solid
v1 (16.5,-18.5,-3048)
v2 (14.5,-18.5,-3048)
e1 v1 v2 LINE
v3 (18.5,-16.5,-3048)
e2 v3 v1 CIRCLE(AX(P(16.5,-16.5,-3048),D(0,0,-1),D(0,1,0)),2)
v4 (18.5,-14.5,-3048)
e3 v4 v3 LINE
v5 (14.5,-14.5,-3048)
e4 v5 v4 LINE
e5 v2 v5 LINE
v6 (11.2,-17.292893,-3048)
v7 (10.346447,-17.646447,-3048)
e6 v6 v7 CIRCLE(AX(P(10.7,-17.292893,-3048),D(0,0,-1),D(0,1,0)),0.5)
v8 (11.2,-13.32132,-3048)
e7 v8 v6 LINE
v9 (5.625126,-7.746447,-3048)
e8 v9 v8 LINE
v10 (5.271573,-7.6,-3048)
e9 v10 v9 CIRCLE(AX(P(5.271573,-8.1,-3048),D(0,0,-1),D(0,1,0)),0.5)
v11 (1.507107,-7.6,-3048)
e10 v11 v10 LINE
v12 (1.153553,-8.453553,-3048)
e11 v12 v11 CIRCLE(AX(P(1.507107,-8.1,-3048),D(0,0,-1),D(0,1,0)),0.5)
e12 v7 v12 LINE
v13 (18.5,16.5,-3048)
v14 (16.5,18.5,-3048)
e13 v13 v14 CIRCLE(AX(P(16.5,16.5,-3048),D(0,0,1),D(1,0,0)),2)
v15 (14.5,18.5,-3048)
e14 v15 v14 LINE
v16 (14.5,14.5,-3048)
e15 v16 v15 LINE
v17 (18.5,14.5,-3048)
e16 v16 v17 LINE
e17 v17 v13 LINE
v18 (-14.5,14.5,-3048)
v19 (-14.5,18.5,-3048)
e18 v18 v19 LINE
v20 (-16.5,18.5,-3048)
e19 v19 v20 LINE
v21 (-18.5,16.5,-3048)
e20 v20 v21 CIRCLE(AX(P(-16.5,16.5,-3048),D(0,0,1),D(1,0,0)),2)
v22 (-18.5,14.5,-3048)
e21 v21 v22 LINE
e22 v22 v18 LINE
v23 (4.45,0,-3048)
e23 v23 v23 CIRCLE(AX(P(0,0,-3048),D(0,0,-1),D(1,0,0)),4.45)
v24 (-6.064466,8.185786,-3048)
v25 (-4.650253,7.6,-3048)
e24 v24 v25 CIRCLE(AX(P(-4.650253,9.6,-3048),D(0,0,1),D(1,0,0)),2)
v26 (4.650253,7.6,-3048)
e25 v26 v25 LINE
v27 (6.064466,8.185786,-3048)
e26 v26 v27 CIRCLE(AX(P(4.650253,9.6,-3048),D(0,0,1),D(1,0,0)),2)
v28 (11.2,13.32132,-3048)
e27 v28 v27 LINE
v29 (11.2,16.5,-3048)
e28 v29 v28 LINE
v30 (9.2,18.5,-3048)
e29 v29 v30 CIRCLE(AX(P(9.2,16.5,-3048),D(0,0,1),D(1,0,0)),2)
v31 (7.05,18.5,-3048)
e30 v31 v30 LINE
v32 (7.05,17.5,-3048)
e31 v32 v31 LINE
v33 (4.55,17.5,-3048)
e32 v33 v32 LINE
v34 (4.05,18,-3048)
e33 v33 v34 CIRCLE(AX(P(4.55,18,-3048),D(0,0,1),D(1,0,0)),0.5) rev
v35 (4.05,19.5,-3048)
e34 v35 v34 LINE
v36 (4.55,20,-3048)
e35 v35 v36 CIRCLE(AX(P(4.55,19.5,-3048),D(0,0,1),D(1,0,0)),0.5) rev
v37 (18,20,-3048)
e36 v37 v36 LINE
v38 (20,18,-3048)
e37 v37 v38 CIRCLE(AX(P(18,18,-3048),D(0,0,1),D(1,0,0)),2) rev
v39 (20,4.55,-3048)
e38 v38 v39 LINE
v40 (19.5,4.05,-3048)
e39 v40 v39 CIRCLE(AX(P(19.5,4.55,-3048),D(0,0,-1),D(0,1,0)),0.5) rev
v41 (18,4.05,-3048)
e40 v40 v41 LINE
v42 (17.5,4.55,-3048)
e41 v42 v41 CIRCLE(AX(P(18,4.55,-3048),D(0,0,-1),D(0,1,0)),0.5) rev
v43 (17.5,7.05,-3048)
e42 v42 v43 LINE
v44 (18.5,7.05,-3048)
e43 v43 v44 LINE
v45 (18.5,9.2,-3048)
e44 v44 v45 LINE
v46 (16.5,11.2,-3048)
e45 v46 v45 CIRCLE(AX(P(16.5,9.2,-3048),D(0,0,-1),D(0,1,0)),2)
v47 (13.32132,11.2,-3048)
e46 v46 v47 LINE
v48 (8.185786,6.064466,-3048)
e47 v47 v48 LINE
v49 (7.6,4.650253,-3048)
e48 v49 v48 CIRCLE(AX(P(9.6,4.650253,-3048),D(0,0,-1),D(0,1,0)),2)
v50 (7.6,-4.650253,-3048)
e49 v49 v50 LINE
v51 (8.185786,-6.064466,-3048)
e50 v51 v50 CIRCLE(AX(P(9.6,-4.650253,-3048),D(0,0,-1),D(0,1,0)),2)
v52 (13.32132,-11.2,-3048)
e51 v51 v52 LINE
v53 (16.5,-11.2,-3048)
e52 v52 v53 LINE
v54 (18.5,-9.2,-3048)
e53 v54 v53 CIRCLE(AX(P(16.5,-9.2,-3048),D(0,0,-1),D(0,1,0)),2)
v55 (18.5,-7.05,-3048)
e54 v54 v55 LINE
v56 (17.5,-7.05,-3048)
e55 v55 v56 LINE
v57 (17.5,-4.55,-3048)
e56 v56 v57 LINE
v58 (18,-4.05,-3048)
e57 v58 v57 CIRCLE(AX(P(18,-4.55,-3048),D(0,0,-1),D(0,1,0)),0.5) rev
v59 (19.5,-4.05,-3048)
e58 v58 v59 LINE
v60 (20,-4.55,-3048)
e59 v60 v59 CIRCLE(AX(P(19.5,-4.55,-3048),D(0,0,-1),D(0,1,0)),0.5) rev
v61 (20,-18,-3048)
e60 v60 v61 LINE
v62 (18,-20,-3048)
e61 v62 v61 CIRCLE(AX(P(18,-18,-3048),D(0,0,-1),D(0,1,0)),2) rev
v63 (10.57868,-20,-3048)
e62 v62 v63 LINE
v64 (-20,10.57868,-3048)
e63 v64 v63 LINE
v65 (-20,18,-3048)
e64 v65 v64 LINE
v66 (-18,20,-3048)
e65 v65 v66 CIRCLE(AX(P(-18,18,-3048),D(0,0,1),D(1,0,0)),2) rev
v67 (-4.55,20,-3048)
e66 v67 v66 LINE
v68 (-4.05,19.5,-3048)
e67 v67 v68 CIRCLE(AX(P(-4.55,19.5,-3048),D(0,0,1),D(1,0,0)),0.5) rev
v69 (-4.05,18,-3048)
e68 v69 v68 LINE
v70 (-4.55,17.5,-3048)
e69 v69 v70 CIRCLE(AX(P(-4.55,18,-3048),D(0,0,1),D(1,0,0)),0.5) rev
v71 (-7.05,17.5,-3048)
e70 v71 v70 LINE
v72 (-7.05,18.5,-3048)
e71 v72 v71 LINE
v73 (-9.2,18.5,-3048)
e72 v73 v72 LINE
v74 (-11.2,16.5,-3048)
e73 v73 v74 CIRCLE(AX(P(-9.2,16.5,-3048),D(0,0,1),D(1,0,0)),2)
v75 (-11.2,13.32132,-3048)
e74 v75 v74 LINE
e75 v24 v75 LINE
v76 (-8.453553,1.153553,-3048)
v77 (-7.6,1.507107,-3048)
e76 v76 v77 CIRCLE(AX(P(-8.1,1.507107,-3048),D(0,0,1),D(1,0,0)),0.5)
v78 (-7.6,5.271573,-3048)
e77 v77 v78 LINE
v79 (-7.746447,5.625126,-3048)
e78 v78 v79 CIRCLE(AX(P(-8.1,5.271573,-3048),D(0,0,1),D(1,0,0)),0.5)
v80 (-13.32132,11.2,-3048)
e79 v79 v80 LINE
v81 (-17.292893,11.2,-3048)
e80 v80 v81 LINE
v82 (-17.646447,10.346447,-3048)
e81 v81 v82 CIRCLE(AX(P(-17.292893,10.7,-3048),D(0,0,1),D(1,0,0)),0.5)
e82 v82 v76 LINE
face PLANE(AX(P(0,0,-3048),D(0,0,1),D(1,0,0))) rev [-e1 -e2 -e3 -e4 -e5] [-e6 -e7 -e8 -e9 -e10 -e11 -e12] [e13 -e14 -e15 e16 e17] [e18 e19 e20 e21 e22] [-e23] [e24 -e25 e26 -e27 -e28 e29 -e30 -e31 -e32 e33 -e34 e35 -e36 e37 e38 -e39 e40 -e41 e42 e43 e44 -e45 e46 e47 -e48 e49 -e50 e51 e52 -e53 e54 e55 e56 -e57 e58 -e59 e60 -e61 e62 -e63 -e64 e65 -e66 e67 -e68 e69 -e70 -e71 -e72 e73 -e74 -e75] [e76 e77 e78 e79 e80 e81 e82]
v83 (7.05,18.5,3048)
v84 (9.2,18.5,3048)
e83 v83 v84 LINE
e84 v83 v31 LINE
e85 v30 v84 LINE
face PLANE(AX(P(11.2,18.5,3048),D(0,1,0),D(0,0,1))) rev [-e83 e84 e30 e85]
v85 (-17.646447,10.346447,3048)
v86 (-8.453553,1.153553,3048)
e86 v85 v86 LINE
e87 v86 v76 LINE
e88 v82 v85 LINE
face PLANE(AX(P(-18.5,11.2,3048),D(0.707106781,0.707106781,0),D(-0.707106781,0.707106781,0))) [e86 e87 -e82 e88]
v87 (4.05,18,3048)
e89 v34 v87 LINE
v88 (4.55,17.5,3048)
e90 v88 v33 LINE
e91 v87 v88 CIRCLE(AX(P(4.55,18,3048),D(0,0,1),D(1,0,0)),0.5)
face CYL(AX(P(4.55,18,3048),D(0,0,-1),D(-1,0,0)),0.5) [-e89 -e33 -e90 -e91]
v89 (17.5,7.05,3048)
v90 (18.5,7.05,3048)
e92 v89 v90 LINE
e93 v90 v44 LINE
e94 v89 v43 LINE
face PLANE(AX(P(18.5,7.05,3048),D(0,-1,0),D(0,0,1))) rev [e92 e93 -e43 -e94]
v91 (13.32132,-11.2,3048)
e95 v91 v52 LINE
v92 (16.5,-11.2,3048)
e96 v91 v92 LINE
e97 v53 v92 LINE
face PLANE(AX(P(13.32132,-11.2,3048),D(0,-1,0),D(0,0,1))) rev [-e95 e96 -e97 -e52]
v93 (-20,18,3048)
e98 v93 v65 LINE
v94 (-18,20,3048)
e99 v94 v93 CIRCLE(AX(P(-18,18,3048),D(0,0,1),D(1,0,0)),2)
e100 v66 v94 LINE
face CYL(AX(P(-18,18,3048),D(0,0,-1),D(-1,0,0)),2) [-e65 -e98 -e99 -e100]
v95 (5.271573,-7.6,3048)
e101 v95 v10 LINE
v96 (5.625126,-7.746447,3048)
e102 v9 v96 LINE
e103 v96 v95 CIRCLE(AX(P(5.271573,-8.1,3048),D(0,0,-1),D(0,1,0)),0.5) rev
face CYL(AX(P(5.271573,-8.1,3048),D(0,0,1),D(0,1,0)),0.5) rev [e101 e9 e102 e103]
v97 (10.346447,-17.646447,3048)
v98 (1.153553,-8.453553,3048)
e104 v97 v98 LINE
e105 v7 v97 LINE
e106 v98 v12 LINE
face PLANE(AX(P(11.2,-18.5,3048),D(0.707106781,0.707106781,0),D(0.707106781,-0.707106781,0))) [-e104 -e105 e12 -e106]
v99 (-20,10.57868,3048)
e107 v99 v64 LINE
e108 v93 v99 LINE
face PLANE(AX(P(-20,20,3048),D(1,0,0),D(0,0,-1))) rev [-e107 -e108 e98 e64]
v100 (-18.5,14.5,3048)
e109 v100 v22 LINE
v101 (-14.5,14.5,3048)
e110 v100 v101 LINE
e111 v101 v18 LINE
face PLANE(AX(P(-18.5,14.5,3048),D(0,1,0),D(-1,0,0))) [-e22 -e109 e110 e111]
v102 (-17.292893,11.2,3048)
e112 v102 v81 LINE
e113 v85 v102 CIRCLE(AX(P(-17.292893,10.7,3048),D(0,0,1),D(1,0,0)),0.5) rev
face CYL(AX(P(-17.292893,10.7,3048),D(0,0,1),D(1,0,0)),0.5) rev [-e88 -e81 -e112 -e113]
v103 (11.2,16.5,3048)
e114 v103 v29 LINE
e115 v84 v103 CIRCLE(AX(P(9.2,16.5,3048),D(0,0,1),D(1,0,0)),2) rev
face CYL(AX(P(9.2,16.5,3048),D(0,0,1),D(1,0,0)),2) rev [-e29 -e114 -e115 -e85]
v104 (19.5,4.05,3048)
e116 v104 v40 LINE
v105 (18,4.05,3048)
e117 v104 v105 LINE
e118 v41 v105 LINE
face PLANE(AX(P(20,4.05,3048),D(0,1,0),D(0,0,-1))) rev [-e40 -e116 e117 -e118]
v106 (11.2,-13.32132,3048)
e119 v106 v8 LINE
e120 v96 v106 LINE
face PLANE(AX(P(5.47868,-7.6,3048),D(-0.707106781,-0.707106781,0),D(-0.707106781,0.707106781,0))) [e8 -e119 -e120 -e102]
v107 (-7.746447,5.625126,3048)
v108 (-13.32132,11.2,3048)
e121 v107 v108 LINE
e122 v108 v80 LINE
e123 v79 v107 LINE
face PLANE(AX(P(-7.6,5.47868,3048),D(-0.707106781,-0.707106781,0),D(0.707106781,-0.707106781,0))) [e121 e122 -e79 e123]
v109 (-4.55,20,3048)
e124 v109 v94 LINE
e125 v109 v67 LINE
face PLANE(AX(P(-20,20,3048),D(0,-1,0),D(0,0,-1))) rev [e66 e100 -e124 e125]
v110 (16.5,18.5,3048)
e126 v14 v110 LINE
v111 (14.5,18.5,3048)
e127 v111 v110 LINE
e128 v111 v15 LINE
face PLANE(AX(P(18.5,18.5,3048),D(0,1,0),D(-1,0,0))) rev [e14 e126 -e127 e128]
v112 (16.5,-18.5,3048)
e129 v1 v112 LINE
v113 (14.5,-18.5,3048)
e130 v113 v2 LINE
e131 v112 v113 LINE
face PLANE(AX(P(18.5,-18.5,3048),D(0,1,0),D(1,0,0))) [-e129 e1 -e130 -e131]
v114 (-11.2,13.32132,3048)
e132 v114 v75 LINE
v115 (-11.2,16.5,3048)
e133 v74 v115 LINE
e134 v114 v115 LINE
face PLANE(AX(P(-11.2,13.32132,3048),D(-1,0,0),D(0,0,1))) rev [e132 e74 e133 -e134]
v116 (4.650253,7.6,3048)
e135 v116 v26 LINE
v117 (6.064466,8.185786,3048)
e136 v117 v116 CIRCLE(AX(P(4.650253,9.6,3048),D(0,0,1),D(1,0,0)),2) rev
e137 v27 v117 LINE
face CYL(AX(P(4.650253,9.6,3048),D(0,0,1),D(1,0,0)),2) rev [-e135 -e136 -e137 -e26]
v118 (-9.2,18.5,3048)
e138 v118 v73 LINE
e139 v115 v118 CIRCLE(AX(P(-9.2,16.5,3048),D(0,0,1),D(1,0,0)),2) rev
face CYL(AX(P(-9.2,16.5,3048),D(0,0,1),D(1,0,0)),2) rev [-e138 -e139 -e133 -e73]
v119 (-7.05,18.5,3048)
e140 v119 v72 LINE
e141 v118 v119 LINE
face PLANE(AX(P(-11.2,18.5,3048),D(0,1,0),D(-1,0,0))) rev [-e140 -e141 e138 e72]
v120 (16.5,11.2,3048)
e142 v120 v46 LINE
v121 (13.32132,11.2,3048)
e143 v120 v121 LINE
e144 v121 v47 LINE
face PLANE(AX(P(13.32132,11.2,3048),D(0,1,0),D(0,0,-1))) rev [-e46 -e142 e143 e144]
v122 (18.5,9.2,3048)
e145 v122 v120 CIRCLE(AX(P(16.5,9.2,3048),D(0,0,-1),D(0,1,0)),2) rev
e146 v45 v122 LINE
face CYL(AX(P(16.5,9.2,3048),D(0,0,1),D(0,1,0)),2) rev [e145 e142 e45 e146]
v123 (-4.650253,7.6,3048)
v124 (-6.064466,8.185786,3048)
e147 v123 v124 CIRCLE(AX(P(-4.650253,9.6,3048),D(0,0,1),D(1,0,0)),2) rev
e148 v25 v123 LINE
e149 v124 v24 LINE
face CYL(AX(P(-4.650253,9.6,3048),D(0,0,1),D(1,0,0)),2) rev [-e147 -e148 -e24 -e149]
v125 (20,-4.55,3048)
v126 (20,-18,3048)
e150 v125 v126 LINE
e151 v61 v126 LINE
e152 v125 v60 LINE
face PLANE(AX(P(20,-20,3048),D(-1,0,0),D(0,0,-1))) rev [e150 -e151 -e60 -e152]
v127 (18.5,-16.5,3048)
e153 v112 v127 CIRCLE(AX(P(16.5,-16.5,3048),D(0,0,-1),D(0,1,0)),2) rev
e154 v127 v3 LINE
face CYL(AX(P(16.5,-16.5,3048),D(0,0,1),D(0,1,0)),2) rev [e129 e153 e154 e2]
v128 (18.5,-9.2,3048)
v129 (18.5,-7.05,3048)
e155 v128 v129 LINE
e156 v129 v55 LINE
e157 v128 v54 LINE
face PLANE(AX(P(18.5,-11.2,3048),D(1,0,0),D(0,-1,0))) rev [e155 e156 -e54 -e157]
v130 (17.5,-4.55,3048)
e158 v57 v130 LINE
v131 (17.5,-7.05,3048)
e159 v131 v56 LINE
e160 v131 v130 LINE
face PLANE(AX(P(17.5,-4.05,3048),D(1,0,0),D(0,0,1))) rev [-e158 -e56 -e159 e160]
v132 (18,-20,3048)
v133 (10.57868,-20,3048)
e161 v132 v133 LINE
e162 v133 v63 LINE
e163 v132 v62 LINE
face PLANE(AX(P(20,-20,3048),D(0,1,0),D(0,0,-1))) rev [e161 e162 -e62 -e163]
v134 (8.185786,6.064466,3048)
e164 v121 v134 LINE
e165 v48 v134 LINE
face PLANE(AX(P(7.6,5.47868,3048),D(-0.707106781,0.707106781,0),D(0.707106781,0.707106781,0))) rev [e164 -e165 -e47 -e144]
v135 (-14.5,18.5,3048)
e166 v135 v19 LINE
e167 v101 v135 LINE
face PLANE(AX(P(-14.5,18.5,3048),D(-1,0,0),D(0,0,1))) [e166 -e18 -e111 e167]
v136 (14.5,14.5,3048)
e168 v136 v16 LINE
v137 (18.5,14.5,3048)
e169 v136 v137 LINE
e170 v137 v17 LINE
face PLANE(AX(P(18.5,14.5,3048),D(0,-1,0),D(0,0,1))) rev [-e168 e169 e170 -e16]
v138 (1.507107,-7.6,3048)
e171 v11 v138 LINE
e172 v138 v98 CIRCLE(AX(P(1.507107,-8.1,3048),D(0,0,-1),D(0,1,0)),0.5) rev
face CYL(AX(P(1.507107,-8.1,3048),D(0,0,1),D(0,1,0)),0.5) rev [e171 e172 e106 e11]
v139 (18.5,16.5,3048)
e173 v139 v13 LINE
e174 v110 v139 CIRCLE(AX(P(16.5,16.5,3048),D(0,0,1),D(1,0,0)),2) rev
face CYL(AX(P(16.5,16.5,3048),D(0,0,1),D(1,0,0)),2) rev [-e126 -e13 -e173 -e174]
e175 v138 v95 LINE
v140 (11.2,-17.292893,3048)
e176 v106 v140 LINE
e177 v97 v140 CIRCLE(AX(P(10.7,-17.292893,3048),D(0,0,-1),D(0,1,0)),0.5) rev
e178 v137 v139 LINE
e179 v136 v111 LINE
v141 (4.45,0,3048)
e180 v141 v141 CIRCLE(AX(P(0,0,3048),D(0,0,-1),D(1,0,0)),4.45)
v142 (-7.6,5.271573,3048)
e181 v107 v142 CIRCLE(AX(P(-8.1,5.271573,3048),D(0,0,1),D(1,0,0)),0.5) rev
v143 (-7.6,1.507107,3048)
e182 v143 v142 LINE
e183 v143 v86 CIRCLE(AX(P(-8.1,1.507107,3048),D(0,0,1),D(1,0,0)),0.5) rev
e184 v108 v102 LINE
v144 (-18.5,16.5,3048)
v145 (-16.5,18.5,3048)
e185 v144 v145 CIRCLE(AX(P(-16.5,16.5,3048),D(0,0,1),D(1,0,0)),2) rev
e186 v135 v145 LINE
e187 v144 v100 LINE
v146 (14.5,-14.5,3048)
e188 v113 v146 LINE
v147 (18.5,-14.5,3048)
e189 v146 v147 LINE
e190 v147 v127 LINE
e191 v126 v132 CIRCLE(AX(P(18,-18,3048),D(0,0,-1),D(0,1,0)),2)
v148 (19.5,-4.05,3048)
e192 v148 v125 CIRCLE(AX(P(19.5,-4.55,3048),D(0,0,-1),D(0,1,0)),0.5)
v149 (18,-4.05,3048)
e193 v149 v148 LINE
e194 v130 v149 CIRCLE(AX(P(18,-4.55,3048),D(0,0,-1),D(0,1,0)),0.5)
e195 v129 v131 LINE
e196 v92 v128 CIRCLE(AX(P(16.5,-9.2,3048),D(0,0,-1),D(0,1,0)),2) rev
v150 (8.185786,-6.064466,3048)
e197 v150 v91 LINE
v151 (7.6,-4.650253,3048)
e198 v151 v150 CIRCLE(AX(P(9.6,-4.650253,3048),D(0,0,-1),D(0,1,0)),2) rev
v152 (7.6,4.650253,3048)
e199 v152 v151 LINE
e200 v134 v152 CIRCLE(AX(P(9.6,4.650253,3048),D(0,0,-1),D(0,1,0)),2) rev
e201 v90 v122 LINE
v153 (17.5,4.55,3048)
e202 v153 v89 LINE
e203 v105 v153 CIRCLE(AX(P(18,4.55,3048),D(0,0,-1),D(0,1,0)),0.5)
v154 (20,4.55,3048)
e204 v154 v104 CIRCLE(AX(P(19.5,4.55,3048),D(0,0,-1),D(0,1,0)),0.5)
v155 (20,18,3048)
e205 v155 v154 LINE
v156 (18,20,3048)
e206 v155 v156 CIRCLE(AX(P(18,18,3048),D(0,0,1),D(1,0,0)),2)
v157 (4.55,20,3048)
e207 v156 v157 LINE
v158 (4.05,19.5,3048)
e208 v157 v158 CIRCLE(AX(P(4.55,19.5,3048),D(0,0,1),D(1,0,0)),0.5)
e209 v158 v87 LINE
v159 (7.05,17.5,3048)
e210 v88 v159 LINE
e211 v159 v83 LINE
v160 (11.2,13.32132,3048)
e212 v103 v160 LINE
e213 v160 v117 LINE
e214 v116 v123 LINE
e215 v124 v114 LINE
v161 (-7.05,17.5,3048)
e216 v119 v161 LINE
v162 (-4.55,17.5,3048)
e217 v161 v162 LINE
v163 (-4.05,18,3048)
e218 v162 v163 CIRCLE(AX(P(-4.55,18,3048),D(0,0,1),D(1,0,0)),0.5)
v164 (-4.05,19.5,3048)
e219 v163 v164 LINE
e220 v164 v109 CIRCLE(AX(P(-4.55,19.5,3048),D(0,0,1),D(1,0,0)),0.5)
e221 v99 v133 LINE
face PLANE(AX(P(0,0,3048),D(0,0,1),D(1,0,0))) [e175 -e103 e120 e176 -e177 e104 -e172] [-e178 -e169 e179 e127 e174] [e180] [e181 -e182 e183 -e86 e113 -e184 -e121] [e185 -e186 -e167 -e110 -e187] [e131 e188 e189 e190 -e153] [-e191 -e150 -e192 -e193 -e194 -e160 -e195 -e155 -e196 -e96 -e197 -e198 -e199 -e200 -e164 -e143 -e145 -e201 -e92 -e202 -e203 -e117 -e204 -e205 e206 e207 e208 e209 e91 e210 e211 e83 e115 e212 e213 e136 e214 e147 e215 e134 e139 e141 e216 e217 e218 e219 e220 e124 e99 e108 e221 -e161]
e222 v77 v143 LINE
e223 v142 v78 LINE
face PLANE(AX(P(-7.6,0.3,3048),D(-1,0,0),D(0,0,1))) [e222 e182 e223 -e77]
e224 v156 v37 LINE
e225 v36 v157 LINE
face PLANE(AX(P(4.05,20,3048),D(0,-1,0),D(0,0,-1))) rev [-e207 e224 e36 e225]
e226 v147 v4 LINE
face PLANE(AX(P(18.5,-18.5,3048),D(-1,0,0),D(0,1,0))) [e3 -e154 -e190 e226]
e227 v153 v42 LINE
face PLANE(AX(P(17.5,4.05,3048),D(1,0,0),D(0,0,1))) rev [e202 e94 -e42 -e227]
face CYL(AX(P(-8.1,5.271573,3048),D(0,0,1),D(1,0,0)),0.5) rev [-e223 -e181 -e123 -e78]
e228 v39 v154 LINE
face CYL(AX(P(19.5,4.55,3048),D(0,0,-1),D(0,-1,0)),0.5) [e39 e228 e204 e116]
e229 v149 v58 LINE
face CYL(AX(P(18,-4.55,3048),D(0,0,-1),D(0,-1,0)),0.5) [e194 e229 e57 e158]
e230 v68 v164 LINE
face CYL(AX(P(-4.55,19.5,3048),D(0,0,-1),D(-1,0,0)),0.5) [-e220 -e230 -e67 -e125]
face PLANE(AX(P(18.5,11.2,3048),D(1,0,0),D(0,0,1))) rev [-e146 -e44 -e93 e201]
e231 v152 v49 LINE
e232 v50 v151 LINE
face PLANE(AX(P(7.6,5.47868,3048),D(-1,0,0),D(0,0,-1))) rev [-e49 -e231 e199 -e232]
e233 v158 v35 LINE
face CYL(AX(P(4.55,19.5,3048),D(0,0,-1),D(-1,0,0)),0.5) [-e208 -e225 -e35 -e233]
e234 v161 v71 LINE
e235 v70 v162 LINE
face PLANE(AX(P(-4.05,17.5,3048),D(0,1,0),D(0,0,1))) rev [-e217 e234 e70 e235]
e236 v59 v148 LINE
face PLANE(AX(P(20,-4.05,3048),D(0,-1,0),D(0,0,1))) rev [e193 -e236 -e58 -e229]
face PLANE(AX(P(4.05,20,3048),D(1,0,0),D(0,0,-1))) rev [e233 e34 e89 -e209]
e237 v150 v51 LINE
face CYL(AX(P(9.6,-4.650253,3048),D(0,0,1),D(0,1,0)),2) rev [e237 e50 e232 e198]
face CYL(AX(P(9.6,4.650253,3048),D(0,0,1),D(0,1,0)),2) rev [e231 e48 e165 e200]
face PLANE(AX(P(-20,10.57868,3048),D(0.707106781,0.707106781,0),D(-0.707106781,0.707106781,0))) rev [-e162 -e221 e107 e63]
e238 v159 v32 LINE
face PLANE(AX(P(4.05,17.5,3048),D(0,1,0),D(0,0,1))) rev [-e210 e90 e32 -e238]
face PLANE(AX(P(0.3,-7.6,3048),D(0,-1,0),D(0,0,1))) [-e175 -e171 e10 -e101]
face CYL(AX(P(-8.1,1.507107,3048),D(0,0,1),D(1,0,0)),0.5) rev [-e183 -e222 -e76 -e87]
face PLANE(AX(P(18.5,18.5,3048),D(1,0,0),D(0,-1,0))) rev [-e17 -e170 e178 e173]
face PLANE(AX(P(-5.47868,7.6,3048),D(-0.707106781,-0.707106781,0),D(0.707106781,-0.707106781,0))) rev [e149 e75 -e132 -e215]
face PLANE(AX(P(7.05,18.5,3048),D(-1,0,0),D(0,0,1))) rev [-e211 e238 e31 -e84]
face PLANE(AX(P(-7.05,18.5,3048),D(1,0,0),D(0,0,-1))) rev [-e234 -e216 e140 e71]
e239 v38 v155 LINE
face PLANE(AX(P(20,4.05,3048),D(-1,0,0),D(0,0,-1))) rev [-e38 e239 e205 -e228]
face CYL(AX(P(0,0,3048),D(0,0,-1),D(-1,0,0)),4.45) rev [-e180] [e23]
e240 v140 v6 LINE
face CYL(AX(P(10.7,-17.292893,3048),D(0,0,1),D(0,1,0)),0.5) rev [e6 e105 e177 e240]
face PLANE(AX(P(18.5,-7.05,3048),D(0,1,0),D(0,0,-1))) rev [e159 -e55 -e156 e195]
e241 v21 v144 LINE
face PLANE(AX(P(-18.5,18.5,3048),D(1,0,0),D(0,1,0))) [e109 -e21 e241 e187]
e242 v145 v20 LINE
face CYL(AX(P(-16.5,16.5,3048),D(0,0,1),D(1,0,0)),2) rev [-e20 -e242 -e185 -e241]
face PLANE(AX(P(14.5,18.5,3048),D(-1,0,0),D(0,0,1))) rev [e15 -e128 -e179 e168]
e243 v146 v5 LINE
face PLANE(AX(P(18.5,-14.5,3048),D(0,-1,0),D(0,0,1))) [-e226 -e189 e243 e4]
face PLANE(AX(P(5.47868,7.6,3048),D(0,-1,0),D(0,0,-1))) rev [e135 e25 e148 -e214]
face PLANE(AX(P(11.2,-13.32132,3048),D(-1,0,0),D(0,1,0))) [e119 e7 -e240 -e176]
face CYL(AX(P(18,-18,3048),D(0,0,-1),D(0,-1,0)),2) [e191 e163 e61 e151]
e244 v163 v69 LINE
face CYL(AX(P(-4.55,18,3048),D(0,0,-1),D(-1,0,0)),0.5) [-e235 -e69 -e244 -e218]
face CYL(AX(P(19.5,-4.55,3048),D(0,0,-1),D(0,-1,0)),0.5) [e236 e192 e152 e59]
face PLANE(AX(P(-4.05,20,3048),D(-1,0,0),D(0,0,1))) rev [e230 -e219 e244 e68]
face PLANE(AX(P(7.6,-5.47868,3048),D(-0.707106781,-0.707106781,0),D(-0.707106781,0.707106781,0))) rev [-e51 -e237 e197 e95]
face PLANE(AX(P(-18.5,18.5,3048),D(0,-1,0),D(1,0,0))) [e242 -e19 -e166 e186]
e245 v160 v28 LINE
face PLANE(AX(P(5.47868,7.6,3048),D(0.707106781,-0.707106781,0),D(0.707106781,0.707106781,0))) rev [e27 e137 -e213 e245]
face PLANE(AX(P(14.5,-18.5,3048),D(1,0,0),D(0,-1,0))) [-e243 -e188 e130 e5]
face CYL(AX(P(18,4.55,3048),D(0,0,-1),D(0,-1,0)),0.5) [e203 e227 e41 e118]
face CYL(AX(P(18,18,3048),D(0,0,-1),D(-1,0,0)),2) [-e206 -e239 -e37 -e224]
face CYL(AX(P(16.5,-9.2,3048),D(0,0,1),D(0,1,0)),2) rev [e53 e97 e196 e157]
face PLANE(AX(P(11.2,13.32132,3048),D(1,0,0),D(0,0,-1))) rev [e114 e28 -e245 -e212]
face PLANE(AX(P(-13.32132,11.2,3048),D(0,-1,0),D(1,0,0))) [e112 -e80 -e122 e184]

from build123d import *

# Parameters (mm, degrees)
SKETCH3_W           = 4
SKETCH3_H           = 4
BOSS_EXTRUDE1_DEPTH = 3048
FILLET1_R           = 2
FILLET3_R           = 0.5
FILLET2_START       = -3049
FILLET2_DEPTH       = 6098
FILLET2_START_2     = -3048
FILLET2_2_DEPTH     = 6096


with BuildPart() as part:
    # Sketch3 → Boss-Extrude1 (new, symmetric)
    with BuildSketch(Plane.XY):
        with BuildLine():
            Line((18.5, 18.5), (14.5, 18.5))
            Line((14.5, 18.5), (14.5, 14.5))
            Line((14.5, 14.5), (3.146625176, 3.146625176))
            ThreePointArc((3.146625176, 3.146625176), (-3.146625176, 3.146625176), (-3.146625176, -3.146625176))
            Line((-3.146625176, -3.146625176), (-4.710660172, -4.710660172))
            Line((-4.710660172, -4.710660172), (-20, 10.578679656))
            Line((-20, 10.578679656), (-20, 20))
            Line((-20, 20), (-4.05, 20))
            Line((-4.05, 20), (-4.05, 17.5))
            Line((-4.05, 17.5), (-7.05, 17.5))
            Line((-7.05, 17.5), (-7.05, 18.5))
            Line((-7.05, 18.5), (-11.2, 18.5))
            Line((-11.2, 18.5), (-11.2, 13.321320344))
            Line((-11.2, 13.321320344), (-5.478679656, 7.6))
            Line((-5.478679656, 7.6), (5.478679656, 7.6))
            Line((5.478679656, 7.6), (11.2, 13.321320344))
            Line((11.2, 13.321320344), (11.2, 18.5))
            Line((11.2, 18.5), (7.05, 18.5))
            Line((7.05, 18.5), (7.05, 17.5))
            Line((7.05, 17.5), (4.05, 17.5))
            Line((4.05, 17.5), (4.05, 20))
            Line((4.05, 20), (20, 20))
            Line((20, 20), (18.5, 18.5))
        make_face()
        Polygon((-13.321320344, 11.2), (-18.5, 11.2), (-7.6, 0.3), (-7.6, 5.478679656), align=None, mode=Mode.SUBTRACT)
        with Locations((-16.5, 16.5)):
            Rectangle(SKETCH3_W, SKETCH3_H, mode=Mode.SUBTRACT)
    extrude(amount=BOSS_EXTRUDE1_DEPTH, both=True)

    # Fillet1
    fillet1_edges = [part.edges().sort_by_distance(p)[0] for p in [
        (-20, 20, 0),
        (-11.2, 18.5, 0),
        (-5.478679656, 7.6, 0),
        (5.478679656, 7.6, 0),
        (11.2, 18.5, 0),
        (-18.5, 18.5, 0),
    ]]
    fillet(fillet1_edges, radius=FILLET1_R)

    # Fillet3
    fillet3_edges = [part.edges().sort_by_distance(p)[0] for p in [
        (-4.05, 20, 0),
        (-4.05, 17.5, 0),
        (4.05, 17.5, 0),
        (4.05, 20, 0),
        (-7.6, 5.478679656, 0),
        (-18.5, 11.2, 0),
        (-7.6, 0.3, 0),
    ]]
    fillet(fillet3_edges, radius=FILLET3_R)

    # Mirror1: part across plane


with BuildPart() as part_1:
    add(part.part)
    add(part.part.mirror(Plane(origin=(3.146625176, 3.146625176, 3048), x_dir=(0, 0, 1), z_dir=(-0.7071067811865543, 0.7071067811865408, 0))))

    # Fillet2: read off the stored shape, not the designer's step
    # Fillet2 outline → Fillet2 (cut)
    with BuildSketch(Plane.XY.offset(FILLET2_START)):
        with BuildLine():
            Line((20, 20), (18, 20))
            ThreePointArc((18, 20), (19.414213562, 19.414213562), (20, 18))
            Line((20, 18), (20, 20))
        make_face()
    extrude(amount=FILLET2_DEPTH, mode=Mode.SUBTRACT)

    # Fillet2 2 outline → Fillet2 2 (add)
    with BuildSketch(Plane.XY.offset(FILLET2_START_2)):
        with BuildLine():
            ThreePointArc((16.5, 18.5), (17.914213562, 17.914213562), (18.5, 16.5))
            Line((18.5, 16.5), (18.5, 18.5))
            Line((18.5, 18.5), (16.5, 18.5))
        make_face()
    extrude(amount=FILLET2_2_DEPTH)


solid = part_1.part
